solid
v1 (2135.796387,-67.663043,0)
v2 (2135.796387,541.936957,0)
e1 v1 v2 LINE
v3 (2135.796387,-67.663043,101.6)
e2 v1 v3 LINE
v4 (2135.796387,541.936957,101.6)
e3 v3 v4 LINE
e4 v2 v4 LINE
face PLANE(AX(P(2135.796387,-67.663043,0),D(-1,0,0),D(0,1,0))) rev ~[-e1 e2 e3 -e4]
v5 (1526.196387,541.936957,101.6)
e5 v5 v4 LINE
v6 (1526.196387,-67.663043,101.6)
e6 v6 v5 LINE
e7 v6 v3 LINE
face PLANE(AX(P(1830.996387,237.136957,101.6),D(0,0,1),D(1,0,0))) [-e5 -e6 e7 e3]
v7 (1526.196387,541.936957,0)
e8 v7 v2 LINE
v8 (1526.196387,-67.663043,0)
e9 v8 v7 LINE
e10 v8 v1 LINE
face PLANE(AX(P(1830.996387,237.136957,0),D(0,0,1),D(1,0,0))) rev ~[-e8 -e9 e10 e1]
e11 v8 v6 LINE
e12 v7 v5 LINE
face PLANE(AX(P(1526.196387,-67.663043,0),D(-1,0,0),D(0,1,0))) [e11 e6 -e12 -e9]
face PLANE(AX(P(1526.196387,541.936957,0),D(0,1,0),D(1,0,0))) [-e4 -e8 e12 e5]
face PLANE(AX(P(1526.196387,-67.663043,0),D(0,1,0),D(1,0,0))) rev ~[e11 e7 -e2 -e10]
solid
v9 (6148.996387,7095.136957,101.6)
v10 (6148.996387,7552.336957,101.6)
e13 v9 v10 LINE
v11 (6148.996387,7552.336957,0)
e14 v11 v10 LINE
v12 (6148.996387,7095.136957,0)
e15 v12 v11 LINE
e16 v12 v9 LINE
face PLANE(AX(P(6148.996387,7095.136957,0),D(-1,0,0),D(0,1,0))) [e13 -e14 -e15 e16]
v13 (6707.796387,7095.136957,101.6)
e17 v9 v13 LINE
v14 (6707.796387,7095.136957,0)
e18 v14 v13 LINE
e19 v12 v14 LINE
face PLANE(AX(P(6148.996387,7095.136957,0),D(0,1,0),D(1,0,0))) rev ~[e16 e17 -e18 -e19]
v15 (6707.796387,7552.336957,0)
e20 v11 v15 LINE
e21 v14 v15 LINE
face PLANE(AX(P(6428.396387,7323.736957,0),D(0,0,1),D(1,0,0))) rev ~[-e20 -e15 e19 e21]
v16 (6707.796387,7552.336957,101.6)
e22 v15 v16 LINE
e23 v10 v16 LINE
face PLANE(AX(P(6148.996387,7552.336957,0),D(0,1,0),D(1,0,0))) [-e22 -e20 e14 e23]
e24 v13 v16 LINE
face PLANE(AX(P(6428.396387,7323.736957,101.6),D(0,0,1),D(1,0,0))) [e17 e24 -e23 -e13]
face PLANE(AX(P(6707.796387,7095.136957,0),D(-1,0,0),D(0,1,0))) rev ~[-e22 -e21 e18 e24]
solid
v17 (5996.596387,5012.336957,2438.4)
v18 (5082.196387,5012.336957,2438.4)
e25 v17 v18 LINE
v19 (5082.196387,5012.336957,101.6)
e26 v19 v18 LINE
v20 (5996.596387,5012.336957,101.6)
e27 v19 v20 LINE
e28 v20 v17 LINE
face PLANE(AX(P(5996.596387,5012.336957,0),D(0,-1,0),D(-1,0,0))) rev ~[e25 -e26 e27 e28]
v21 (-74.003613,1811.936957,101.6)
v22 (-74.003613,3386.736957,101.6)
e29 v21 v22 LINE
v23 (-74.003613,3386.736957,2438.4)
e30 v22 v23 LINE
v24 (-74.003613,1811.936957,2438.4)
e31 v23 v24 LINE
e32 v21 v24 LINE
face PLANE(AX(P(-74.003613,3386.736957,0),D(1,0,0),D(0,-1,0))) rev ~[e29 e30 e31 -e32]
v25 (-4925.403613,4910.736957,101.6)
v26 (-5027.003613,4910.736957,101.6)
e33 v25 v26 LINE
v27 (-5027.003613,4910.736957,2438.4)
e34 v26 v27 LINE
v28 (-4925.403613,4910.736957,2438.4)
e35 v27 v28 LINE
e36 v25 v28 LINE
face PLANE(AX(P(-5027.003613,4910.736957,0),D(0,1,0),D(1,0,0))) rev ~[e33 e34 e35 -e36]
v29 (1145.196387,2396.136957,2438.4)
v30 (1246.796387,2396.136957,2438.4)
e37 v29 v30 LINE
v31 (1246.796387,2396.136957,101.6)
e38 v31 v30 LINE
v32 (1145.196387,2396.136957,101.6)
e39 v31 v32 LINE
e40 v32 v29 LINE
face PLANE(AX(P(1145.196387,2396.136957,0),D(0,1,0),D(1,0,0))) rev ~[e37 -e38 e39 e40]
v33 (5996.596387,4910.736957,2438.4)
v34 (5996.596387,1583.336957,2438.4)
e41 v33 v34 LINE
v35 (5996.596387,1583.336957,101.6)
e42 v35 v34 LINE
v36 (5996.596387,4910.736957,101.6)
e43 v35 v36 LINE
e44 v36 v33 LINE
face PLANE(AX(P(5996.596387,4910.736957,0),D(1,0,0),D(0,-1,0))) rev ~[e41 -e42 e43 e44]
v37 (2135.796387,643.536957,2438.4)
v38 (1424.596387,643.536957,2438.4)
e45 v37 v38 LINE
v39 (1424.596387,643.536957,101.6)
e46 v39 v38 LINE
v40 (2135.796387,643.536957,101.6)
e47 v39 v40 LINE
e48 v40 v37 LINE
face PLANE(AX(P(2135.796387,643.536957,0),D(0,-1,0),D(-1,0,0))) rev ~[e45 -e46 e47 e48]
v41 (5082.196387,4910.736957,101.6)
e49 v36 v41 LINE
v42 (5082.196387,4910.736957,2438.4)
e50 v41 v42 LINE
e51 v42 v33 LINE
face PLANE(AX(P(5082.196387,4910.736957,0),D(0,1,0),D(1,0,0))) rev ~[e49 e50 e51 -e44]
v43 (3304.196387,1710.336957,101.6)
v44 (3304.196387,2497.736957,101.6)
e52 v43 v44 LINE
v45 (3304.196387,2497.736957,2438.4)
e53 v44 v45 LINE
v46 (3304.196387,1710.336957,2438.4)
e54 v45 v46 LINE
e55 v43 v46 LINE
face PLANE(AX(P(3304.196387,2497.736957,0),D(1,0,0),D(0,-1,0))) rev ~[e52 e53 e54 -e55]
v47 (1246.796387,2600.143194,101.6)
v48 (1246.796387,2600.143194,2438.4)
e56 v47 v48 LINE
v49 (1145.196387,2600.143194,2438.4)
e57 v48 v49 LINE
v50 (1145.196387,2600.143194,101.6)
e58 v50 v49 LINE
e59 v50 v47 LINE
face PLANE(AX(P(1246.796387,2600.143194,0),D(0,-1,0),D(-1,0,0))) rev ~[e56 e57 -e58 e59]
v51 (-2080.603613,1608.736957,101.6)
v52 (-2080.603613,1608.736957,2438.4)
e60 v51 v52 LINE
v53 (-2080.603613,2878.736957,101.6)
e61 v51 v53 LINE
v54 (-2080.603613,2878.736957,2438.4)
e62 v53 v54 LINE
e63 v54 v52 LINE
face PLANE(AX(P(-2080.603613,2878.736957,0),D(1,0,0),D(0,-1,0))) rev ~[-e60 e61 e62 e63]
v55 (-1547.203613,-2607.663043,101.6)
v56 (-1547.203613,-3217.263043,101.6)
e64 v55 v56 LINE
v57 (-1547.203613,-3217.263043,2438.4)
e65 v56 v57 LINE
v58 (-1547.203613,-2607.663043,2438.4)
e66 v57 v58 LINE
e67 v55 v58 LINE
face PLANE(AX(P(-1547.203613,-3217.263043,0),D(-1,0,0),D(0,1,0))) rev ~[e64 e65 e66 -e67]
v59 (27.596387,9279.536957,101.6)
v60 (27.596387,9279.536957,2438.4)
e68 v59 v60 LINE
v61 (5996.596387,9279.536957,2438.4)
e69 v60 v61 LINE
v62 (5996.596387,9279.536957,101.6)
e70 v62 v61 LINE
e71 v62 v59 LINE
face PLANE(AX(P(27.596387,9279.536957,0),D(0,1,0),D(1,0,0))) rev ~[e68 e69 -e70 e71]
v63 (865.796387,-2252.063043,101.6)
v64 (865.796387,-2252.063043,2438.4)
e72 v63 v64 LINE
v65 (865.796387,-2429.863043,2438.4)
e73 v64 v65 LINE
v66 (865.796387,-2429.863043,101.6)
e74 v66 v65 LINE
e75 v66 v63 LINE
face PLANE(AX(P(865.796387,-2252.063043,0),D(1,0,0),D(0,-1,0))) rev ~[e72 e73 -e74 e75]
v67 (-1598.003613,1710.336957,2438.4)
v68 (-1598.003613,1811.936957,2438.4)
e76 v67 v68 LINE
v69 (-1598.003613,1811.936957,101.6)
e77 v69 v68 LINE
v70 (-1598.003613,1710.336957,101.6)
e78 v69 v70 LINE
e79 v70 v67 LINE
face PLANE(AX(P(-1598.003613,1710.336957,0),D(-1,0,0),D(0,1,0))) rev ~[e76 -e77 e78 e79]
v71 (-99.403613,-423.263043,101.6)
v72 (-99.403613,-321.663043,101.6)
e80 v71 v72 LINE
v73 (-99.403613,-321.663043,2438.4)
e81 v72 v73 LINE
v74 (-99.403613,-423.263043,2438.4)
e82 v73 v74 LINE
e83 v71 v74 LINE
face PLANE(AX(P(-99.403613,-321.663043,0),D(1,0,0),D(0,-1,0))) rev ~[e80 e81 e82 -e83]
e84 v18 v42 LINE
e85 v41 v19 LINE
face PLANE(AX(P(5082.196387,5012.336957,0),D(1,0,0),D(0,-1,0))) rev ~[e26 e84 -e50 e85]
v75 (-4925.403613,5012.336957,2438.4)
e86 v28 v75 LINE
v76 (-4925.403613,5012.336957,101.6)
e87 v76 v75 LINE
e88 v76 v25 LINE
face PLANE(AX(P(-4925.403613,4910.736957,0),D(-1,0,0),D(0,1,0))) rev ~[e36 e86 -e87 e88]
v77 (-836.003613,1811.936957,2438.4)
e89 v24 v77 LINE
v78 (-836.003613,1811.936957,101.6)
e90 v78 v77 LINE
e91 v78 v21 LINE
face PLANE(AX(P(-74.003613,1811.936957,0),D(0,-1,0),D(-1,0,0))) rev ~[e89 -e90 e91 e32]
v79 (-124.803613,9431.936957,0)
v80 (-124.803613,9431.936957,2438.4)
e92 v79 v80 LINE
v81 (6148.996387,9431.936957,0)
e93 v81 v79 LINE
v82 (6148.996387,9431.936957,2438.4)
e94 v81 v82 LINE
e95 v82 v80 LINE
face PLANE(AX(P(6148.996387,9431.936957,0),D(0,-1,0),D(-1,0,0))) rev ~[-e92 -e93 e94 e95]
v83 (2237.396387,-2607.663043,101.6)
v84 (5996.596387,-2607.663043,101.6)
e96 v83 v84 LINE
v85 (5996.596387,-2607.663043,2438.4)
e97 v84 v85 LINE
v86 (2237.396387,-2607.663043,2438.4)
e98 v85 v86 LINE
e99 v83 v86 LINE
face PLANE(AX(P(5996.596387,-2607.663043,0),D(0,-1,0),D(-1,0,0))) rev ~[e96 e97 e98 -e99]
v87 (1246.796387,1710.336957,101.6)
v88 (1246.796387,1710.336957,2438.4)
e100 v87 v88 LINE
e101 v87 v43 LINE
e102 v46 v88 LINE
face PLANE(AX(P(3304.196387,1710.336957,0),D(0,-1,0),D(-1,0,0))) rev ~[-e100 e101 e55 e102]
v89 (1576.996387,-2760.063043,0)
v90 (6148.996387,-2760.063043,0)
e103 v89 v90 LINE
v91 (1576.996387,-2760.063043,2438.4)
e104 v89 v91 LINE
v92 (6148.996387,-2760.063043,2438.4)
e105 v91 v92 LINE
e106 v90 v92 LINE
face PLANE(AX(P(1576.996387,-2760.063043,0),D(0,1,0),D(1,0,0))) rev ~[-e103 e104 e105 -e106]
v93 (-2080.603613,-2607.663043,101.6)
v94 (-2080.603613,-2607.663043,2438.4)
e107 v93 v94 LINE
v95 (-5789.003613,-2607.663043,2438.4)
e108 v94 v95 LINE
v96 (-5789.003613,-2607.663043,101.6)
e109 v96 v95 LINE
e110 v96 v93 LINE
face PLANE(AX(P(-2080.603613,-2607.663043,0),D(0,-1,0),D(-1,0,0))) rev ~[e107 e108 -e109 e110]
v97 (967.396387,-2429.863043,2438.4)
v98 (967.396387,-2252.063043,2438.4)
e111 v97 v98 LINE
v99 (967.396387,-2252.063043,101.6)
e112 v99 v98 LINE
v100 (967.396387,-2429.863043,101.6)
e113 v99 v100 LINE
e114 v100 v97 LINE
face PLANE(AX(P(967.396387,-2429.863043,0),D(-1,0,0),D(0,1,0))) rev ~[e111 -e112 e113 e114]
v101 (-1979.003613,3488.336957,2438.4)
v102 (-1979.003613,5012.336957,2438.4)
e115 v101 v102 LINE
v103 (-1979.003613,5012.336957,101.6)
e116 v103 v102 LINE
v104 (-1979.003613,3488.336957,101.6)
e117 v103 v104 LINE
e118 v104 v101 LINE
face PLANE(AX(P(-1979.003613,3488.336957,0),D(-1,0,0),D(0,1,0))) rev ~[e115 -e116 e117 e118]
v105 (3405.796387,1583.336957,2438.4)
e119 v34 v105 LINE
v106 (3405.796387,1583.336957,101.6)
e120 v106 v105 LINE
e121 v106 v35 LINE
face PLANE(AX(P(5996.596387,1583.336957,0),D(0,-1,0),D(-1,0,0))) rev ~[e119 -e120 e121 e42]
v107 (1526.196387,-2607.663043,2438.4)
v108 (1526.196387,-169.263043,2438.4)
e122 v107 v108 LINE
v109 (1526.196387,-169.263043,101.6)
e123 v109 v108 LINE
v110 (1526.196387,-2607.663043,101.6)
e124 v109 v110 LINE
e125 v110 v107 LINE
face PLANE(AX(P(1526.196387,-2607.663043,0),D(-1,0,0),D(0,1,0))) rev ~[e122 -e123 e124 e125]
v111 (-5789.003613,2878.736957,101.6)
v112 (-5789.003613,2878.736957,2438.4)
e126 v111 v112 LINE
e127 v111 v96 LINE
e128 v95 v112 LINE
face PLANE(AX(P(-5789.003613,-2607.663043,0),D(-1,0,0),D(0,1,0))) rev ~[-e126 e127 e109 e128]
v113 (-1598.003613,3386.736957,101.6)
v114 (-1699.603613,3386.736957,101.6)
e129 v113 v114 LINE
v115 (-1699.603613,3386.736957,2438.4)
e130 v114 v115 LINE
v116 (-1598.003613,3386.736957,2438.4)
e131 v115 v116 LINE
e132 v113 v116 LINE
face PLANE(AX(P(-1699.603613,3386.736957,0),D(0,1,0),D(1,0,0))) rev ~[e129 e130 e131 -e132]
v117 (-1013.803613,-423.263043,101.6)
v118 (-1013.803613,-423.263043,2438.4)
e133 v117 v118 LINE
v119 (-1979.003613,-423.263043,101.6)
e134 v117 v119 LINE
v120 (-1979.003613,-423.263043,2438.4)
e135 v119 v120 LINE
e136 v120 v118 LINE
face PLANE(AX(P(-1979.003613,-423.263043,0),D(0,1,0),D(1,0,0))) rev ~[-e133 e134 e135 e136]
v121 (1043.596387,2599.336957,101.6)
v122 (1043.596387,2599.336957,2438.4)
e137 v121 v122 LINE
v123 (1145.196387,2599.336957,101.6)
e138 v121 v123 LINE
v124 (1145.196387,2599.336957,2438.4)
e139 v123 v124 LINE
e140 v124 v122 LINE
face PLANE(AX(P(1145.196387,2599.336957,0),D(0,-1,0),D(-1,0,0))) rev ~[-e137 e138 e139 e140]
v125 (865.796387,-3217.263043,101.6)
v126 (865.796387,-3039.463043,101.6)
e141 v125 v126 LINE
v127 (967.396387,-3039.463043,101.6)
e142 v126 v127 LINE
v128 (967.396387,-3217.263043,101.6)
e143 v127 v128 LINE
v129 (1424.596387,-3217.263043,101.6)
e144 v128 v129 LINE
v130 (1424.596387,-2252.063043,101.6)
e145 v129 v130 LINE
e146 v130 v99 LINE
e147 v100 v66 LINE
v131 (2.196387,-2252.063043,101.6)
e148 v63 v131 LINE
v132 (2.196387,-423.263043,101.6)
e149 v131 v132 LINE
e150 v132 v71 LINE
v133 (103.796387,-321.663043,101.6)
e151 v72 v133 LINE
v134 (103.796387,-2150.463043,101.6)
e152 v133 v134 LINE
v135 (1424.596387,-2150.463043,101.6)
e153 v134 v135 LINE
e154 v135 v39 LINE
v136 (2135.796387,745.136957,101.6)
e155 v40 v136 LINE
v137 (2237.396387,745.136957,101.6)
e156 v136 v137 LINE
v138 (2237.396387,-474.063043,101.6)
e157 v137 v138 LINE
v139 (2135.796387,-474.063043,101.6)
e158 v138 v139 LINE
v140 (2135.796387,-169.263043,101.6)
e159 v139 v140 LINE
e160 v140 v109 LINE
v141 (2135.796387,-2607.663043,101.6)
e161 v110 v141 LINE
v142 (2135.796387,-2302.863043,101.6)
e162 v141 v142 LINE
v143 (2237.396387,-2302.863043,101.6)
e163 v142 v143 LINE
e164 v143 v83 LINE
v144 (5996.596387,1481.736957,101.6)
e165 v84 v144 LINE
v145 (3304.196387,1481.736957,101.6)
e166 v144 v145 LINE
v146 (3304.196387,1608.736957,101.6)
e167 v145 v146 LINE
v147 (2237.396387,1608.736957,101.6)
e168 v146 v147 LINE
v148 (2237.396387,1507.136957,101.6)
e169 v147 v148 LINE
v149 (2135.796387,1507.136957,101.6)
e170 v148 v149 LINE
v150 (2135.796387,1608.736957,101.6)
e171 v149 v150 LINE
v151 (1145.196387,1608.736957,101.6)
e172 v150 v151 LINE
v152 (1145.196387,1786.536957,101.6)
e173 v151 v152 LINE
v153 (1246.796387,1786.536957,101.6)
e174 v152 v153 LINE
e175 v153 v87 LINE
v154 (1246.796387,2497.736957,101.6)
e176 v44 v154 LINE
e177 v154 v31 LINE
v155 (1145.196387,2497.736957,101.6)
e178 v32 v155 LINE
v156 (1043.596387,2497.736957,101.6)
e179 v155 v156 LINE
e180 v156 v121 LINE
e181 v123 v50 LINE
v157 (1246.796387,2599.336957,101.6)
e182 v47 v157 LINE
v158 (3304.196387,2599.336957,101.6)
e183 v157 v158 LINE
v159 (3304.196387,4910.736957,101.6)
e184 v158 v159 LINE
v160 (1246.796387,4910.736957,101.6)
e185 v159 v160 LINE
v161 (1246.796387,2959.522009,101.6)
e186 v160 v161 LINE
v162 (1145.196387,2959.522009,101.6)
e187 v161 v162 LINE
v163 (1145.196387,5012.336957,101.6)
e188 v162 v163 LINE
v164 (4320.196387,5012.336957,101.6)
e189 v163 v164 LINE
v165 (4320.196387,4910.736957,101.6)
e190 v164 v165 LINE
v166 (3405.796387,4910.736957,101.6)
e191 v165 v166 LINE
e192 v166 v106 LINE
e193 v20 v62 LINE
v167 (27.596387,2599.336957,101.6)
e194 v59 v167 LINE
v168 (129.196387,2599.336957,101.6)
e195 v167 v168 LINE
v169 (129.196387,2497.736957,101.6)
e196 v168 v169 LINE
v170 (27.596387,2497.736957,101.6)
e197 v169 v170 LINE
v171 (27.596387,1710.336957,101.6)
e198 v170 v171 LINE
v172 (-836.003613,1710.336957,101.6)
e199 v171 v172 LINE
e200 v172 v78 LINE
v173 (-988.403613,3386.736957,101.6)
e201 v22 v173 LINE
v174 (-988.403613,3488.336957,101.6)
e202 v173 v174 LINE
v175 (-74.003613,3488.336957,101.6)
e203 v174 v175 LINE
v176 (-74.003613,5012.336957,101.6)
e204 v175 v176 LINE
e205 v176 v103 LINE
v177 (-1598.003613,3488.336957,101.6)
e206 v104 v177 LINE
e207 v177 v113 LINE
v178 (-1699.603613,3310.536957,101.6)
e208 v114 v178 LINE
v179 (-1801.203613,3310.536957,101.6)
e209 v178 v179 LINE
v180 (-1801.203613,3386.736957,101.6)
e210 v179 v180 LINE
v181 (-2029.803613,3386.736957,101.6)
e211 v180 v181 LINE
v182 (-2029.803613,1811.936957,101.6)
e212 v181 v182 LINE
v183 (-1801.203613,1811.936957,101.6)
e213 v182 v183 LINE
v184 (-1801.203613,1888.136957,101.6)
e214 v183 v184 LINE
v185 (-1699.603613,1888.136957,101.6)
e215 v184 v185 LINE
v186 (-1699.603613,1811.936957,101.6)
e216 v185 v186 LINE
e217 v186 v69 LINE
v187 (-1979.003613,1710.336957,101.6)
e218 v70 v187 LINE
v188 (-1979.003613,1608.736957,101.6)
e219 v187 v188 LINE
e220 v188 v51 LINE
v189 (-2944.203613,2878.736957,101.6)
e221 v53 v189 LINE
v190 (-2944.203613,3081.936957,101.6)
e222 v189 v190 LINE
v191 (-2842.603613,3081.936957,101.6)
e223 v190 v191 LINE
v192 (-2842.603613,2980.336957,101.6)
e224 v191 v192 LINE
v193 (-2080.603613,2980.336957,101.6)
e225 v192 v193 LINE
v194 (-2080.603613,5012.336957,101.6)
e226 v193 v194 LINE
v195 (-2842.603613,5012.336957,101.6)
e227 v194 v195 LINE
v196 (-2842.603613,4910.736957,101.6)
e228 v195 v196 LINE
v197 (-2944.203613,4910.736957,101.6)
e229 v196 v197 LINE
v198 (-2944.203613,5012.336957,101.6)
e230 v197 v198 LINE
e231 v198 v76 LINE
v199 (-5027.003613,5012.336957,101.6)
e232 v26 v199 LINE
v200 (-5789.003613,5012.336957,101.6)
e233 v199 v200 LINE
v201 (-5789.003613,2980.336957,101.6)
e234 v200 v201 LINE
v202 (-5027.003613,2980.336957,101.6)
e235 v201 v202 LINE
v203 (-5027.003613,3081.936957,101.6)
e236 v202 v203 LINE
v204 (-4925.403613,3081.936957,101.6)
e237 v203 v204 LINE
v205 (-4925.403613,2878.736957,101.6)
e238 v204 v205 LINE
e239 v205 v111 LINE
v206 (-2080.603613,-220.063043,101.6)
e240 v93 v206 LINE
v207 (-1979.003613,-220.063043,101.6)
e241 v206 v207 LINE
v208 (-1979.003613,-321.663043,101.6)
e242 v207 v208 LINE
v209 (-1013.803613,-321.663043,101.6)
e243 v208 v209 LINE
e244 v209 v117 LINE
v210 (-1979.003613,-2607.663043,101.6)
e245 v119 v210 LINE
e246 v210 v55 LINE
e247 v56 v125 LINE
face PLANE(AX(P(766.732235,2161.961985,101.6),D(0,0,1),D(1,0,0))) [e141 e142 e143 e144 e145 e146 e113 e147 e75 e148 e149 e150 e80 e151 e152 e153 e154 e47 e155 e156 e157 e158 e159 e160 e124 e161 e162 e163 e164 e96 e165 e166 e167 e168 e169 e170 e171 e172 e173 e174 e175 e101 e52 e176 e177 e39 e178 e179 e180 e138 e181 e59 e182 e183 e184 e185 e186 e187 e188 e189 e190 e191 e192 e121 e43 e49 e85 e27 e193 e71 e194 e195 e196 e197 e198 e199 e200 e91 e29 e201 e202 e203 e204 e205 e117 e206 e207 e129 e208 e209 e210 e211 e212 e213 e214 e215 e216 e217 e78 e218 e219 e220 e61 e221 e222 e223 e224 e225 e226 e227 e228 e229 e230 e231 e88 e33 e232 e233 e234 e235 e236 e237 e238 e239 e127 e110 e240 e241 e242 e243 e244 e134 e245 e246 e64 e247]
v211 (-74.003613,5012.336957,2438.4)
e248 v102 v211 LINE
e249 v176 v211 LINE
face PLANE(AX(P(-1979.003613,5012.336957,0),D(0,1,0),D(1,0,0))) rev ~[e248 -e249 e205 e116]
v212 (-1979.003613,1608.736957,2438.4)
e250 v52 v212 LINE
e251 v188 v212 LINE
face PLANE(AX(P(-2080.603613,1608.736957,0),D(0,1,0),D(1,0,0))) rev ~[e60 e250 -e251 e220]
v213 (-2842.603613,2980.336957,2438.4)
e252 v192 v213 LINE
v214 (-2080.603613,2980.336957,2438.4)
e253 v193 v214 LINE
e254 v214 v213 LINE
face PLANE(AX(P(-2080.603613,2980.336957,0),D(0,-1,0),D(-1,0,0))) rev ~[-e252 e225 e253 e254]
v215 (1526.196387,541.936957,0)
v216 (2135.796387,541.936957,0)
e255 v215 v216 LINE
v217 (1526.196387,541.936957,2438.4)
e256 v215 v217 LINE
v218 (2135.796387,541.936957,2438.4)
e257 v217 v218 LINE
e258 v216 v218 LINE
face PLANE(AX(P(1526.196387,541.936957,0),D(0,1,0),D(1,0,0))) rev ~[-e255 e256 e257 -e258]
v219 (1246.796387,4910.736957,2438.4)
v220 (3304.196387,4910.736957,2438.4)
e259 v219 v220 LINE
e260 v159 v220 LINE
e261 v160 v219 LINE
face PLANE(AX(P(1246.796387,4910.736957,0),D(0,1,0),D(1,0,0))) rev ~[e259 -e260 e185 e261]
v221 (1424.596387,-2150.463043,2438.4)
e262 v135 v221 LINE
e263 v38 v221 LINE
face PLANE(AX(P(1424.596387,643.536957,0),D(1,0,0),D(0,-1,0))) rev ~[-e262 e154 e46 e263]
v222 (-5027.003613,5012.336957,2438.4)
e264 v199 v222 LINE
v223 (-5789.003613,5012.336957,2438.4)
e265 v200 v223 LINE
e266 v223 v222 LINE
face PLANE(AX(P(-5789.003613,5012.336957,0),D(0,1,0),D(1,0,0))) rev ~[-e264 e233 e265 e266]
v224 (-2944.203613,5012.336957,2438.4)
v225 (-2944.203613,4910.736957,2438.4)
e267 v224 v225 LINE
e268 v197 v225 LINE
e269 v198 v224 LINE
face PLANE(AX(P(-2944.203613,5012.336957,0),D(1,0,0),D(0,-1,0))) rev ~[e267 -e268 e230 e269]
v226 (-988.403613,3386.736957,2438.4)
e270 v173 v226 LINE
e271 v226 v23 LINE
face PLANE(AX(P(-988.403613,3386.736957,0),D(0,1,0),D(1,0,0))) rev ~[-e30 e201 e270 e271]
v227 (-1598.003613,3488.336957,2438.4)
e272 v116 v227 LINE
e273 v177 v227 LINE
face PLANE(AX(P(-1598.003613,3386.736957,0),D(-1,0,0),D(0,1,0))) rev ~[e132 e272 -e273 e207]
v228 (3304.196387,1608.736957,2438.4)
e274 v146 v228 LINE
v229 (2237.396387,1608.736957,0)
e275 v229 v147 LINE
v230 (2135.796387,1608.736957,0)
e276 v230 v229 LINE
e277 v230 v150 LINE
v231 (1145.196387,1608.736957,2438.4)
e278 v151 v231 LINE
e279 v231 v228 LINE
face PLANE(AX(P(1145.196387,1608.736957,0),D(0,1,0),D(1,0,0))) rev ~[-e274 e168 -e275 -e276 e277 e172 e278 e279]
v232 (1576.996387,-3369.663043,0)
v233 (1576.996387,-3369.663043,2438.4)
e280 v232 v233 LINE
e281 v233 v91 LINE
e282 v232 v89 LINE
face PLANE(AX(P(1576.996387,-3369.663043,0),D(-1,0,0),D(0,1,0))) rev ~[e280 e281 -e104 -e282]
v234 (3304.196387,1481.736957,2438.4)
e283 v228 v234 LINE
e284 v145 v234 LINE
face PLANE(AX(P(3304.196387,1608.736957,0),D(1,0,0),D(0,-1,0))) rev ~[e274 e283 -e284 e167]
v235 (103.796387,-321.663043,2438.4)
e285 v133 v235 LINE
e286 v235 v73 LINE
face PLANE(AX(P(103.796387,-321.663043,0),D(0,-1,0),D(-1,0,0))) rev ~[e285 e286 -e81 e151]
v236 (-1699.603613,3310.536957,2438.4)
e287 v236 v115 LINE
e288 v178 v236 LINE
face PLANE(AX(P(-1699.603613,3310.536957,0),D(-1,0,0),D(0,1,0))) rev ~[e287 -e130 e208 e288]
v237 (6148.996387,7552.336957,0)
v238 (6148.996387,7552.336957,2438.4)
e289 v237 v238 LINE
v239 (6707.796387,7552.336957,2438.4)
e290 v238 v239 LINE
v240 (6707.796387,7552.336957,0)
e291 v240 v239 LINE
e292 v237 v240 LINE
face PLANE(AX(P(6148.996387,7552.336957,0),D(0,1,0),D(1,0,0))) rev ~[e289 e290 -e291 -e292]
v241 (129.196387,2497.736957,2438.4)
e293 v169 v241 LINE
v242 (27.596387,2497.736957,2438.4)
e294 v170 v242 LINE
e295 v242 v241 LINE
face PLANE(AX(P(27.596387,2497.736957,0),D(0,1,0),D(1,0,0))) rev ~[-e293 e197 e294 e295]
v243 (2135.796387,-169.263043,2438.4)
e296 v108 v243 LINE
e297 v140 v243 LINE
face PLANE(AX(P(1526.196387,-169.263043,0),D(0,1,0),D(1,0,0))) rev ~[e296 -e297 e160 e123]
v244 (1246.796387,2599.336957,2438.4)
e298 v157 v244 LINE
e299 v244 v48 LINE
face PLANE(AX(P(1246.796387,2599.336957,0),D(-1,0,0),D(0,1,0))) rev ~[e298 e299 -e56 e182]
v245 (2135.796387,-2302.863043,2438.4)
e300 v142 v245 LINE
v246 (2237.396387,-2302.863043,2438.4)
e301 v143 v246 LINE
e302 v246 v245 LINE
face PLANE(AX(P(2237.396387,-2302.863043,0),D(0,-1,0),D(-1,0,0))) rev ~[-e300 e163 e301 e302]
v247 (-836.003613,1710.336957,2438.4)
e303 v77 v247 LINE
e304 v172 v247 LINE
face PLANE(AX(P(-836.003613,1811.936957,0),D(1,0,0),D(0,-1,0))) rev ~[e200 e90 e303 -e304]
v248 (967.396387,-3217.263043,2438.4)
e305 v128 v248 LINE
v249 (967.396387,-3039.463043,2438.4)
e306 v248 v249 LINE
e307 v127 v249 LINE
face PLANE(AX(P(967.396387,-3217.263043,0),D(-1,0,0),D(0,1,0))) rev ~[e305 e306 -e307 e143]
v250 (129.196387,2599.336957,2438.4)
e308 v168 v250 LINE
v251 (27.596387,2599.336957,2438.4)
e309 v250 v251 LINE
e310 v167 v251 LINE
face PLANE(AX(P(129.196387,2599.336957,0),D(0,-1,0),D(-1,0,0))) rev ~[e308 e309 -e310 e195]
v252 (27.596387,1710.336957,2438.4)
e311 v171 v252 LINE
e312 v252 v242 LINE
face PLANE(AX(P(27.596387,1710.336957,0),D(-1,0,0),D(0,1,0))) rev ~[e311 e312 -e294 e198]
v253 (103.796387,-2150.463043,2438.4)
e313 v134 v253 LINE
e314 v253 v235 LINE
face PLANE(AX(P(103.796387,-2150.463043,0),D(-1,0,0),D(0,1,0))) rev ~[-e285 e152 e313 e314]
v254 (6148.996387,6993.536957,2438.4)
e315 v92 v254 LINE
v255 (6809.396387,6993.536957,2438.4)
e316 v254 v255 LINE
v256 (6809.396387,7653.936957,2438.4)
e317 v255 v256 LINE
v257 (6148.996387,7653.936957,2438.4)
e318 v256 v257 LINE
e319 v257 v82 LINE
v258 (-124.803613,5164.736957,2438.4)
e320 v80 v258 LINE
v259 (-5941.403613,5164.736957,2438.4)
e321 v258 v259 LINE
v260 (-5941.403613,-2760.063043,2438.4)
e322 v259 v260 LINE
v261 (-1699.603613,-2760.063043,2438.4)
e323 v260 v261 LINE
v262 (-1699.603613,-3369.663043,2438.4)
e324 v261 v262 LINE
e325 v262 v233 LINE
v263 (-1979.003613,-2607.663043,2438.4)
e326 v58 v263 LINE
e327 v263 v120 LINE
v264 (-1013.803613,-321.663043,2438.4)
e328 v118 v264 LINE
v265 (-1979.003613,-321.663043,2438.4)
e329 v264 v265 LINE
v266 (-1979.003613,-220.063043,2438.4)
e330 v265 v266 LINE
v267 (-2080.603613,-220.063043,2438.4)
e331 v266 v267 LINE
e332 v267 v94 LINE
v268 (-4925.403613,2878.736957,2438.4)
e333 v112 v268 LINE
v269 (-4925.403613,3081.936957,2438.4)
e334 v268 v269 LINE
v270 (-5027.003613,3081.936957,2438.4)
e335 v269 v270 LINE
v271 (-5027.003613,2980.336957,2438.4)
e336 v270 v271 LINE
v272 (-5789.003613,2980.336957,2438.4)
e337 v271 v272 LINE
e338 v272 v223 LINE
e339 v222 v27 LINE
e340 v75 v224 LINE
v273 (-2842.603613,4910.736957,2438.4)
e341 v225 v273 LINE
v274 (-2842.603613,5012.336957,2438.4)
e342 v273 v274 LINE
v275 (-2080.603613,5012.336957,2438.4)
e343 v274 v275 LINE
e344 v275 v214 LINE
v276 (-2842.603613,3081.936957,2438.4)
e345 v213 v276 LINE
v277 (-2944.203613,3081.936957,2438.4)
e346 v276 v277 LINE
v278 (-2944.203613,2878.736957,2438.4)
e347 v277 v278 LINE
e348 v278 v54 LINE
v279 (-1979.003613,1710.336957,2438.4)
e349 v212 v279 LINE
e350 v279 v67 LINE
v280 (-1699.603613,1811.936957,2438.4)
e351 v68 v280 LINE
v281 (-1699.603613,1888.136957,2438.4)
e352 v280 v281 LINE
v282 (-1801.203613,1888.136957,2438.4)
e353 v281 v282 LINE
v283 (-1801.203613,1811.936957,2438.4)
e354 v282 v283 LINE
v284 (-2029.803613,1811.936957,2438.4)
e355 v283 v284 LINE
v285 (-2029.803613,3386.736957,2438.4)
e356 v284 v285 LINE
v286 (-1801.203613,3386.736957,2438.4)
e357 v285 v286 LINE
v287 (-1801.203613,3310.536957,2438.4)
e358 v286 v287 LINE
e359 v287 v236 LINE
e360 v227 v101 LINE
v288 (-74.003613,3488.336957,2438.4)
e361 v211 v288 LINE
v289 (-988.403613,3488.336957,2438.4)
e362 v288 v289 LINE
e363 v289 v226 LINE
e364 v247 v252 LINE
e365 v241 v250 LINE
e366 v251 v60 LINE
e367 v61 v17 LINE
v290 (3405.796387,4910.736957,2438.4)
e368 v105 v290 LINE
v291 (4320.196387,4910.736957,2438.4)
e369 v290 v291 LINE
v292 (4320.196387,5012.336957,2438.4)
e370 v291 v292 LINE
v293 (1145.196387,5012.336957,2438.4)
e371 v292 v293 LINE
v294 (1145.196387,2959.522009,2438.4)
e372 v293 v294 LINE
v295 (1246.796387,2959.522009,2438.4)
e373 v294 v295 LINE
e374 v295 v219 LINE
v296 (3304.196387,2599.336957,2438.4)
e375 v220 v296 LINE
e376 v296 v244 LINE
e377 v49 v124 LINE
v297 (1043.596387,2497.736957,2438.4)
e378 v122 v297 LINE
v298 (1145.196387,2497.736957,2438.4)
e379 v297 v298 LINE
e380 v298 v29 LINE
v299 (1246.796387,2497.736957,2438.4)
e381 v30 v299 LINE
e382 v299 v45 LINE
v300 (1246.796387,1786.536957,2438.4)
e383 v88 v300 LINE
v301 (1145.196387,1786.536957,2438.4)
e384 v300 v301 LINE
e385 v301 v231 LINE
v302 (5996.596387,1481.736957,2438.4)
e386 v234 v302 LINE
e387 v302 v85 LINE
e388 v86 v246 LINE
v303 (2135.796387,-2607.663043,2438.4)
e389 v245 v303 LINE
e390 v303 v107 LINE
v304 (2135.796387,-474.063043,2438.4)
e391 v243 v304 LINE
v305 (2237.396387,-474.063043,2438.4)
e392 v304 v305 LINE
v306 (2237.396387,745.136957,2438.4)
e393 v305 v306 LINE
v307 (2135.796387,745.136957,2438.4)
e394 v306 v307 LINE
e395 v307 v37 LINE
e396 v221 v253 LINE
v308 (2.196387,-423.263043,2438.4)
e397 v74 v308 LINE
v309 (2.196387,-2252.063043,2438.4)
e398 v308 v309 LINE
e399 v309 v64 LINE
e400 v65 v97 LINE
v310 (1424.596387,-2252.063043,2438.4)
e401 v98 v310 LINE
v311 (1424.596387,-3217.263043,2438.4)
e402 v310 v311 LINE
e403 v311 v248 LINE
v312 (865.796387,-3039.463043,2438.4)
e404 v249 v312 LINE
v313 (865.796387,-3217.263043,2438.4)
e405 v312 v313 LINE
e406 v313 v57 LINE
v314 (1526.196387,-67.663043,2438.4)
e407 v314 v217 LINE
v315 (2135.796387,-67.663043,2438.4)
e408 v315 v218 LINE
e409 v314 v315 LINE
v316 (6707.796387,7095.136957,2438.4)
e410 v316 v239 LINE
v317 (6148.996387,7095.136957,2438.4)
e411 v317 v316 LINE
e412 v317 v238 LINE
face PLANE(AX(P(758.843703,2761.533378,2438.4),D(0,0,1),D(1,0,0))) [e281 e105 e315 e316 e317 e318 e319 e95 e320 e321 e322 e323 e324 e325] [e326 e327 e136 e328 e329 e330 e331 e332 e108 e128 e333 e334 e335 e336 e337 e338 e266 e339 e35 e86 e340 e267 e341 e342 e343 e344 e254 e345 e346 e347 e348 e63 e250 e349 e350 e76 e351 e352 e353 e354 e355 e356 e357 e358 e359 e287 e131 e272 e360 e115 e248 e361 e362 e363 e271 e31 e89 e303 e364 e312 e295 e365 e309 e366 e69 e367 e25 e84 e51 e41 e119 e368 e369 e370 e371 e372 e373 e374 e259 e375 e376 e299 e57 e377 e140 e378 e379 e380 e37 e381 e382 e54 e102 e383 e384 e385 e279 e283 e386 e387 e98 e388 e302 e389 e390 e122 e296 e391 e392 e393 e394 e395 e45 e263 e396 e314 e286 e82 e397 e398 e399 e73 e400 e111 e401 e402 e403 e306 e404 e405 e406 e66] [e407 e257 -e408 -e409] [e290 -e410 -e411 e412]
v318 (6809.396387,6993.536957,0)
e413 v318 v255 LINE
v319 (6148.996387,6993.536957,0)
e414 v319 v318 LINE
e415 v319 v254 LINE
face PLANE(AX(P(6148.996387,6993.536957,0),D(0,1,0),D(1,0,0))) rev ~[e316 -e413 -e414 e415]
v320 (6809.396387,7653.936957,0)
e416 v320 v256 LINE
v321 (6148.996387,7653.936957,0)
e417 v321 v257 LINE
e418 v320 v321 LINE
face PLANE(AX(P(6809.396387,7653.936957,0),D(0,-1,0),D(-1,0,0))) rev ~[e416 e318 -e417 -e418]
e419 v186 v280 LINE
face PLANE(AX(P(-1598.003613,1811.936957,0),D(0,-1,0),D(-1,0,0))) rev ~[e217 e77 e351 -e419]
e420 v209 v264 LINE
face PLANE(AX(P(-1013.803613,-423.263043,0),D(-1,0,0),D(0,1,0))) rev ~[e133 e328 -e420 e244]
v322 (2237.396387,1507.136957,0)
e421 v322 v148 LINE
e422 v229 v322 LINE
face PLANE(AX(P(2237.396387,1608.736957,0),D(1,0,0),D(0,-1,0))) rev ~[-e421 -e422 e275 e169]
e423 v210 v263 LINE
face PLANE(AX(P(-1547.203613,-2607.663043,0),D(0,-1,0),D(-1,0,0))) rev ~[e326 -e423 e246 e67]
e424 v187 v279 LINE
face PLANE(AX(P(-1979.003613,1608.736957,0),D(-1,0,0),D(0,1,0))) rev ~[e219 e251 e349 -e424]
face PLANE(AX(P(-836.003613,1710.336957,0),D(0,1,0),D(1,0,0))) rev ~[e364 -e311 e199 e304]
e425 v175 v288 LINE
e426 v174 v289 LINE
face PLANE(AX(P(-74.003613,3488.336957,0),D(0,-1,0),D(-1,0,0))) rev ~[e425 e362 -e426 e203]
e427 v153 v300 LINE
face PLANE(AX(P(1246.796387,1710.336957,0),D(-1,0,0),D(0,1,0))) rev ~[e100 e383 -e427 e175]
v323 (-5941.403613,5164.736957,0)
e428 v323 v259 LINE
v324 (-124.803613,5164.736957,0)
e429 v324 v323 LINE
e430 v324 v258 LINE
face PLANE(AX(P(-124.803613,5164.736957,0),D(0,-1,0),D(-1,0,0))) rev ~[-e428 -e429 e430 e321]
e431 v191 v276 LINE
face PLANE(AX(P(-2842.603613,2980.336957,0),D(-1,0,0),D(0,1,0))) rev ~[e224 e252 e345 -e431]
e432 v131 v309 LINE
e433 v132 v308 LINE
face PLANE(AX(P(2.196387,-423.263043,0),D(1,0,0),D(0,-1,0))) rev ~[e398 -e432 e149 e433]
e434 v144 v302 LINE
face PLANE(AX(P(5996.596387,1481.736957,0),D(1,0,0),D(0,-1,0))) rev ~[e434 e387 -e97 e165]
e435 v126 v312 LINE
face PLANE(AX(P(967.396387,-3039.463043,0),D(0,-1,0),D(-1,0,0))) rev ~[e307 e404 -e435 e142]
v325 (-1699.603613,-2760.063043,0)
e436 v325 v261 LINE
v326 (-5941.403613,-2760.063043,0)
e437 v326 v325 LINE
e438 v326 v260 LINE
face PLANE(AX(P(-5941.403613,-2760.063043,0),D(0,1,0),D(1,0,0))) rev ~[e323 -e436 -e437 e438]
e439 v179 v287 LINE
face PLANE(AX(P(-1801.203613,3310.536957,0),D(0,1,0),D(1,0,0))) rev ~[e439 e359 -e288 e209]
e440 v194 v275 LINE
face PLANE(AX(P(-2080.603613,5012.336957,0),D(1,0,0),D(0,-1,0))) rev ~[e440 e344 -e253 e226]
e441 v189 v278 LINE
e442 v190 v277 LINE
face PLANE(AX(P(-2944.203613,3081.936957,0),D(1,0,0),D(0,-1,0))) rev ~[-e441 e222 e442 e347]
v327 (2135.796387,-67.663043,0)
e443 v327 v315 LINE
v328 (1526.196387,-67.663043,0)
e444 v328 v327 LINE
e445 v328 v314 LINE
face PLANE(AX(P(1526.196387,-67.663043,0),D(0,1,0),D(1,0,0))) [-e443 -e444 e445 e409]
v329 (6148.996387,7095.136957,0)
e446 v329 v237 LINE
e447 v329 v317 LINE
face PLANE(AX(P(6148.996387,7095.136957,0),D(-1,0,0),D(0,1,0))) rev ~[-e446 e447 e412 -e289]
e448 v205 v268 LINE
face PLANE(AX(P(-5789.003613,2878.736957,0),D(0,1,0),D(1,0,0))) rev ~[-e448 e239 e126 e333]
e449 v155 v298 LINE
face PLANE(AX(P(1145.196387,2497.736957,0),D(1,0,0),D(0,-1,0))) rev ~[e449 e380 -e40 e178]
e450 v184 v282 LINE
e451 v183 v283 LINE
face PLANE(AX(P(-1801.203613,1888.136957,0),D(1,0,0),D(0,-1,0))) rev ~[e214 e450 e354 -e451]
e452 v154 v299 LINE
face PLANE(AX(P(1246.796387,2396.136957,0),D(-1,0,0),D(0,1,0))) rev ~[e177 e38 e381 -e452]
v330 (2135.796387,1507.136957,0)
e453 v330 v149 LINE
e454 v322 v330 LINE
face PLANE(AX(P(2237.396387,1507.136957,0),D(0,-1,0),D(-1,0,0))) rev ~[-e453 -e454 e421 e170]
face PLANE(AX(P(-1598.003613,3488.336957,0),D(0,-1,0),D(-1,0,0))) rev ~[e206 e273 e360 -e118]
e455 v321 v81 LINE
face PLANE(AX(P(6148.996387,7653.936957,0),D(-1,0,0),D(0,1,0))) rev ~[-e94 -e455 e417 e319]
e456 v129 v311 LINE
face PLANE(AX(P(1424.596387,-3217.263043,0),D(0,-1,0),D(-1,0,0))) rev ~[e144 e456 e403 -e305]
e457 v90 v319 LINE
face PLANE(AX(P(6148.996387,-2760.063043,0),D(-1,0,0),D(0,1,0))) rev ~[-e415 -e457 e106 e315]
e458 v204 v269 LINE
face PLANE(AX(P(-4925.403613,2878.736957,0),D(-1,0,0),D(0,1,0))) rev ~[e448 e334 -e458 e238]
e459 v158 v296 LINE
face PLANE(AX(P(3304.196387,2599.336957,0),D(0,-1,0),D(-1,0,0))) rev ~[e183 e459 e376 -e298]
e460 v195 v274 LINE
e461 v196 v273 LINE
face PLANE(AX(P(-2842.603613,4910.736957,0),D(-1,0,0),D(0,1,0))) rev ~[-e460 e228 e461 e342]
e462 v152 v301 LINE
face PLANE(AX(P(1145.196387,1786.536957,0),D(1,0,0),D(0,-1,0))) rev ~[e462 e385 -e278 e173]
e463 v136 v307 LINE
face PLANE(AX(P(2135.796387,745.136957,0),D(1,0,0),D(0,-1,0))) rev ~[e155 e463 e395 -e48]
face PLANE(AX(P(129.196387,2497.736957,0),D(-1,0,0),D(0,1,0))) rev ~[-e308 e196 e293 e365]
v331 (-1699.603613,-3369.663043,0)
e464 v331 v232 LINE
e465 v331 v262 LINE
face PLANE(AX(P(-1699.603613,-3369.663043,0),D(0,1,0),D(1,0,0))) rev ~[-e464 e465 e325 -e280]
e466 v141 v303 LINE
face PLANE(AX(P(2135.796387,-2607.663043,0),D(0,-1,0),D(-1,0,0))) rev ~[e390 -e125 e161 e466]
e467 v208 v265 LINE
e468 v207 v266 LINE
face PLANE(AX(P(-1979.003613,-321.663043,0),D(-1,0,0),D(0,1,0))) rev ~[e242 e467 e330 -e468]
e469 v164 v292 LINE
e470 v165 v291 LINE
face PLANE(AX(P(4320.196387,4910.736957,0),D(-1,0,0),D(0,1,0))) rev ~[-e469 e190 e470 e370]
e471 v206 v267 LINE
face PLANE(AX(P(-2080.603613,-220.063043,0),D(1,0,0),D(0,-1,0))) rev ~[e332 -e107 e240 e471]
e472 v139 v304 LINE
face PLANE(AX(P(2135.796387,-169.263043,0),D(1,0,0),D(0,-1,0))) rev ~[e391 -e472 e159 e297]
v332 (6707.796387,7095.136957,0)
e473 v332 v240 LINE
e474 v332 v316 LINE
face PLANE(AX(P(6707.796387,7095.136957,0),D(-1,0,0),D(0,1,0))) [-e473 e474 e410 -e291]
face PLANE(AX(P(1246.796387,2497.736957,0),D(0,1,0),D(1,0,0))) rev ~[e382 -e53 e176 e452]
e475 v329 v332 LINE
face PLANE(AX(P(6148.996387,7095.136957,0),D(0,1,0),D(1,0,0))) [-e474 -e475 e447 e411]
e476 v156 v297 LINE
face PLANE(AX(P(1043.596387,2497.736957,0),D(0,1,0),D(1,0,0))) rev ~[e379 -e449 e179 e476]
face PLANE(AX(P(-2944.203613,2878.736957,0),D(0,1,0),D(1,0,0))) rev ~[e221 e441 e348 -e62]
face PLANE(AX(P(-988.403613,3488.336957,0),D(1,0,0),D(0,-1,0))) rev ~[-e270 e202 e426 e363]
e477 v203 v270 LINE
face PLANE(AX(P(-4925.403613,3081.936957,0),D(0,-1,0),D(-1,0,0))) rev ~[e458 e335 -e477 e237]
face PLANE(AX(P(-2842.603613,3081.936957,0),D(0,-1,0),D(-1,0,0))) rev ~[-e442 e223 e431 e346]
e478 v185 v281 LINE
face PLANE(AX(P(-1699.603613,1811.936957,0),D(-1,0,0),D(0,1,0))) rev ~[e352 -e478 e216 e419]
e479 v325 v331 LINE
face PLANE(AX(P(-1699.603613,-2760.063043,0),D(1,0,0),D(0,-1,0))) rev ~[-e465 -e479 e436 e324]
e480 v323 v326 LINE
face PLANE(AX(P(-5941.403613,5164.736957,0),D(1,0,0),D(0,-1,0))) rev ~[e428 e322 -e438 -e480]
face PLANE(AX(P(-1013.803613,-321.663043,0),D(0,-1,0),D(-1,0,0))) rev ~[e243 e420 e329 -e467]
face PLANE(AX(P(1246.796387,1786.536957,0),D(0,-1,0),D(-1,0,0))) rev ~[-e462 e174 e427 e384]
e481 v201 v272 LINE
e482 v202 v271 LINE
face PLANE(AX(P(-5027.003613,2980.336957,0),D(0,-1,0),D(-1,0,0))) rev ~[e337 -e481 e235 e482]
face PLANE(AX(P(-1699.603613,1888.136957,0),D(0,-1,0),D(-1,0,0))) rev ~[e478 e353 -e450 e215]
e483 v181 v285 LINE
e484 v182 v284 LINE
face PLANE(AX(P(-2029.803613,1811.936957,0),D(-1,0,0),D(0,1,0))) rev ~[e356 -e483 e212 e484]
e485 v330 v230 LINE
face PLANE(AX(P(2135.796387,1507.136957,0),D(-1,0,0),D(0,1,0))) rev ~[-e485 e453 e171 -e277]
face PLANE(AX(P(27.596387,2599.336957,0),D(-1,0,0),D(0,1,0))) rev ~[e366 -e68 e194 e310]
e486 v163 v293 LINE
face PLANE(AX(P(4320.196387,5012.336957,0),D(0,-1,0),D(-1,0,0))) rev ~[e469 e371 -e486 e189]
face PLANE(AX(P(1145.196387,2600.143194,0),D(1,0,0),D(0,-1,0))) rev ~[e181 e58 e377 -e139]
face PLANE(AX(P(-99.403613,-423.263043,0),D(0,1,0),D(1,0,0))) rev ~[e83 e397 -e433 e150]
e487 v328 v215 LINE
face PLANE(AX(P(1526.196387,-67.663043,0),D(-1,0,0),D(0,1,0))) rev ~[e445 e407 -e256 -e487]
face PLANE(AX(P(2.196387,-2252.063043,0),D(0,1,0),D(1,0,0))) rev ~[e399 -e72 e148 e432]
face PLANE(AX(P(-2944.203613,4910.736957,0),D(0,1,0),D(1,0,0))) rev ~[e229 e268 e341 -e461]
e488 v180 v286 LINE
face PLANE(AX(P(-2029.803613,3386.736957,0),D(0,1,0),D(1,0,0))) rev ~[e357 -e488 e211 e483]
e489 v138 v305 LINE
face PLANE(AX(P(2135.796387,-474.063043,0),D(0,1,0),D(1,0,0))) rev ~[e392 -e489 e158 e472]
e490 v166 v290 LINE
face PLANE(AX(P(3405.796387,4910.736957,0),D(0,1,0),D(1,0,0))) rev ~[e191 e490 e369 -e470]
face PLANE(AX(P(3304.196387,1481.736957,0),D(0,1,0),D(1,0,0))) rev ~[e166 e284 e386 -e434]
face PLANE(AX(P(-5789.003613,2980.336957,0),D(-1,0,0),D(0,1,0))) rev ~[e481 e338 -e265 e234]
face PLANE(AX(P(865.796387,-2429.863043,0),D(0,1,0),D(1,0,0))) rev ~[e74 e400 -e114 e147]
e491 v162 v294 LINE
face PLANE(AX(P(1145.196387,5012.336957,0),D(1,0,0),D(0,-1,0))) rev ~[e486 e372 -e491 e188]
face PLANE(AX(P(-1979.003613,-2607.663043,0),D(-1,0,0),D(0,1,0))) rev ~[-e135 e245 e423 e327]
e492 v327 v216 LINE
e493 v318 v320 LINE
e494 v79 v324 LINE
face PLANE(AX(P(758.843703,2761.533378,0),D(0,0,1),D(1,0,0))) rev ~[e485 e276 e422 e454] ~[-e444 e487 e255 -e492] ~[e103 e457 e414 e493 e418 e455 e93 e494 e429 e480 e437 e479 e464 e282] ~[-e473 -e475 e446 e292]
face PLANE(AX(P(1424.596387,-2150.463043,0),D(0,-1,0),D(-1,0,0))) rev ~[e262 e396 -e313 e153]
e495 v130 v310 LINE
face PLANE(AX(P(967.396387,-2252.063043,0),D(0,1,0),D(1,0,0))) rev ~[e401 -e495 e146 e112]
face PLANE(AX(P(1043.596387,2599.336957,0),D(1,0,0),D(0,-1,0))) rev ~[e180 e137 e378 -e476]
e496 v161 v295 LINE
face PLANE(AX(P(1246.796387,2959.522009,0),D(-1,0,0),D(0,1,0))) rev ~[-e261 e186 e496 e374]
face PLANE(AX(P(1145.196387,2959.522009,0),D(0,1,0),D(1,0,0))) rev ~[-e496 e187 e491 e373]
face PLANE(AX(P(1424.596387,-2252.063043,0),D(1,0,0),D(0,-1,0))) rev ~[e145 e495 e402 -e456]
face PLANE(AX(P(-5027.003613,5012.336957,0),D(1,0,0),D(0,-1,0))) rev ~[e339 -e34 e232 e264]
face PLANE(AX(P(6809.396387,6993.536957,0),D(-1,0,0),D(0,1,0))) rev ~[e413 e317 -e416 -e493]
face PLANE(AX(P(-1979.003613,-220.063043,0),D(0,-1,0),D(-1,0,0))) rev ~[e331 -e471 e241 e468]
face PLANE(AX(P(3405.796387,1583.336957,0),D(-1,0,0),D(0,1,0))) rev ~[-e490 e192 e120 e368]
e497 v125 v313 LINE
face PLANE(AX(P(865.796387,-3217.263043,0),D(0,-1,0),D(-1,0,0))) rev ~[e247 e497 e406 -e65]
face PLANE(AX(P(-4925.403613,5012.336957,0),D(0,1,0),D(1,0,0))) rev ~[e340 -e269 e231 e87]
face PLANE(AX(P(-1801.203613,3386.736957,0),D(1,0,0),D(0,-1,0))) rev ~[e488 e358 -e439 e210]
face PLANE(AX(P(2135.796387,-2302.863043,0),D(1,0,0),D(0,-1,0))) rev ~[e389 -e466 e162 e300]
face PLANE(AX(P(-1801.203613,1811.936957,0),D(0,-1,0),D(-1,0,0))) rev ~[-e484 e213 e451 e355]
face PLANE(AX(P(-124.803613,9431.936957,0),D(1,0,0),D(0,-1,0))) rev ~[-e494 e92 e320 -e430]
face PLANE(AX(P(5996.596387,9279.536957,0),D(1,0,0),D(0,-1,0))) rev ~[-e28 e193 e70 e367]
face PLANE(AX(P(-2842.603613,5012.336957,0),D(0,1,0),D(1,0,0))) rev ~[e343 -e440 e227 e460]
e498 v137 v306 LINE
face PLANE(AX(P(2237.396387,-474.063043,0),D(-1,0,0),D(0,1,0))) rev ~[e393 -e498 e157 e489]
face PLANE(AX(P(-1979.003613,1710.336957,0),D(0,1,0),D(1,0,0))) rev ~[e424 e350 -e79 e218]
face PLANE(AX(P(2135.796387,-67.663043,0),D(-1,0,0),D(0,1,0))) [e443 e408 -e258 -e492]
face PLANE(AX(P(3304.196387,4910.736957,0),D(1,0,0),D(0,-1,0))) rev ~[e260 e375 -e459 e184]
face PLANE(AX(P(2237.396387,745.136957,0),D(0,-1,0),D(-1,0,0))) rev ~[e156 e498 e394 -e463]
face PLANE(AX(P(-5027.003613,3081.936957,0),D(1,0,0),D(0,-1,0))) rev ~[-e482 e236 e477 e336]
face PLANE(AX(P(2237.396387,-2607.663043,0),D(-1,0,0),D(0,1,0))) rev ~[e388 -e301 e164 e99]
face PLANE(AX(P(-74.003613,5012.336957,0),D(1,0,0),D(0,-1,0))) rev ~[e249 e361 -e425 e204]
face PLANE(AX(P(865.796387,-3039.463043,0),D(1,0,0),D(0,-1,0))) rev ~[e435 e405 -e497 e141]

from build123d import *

# Parameters (mm, degrees)
F1_DEPTH = 101.6
F0_W     = 609.6
F0_H     = 609.6
F0_W_2   = 558.8
F0_H_2   = 457.2
F2_DEPTH = 2438.4


with BuildPart() as f1:
    # F0 (on Top) → F1 (new body)
    with BuildSketch(Plane.XY):
        Polygon((5996.5963871956, 9279.5369567871), (27.5963871956, 9279.5369567871), (27.5963871956, 5012.3369567871), (27.5963871956, 2599.3369567871), (129.1963871956, 2599.3369567871), (129.1963871956, 2497.7369567871), (27.5963871956, 2497.7369567871), (27.5963871956, 1710.3369567871), (-836.0036128044, 1710.3369567871), (-836.0036128044, 1811.9369567871), (-74.0036128044, 1811.9369567871), (-74.0036128044, 3386.7369567871), (-988.4036128044, 3386.7369567871), (-988.4036128044, 3488.3369567871), (-74.0036128044, 3488.3369567871), (-74.0036128044, 5012.3369567871), (-1979.0036128044, 5012.3369567871), (-1979.0036128044, 3488.3369567871), (-1598.0036128044, 3488.3369567871), (-1598.0036128044, 3386.7369567871), (-1699.6036128044, 3386.7369567871), (-1699.6036128044, 3310.5369567871), (-1801.2036128044, 3310.5369567871), (-1801.2036128044, 3386.7369567871), (-2029.8036128044, 3386.7369567871), (-2029.8036128044, 1811.9369567871), (-1801.2036128044, 1811.9369567871), (-1801.2036128044, 1888.1369567871), (-1699.6036128044, 1888.1369567871), (-1699.6036128044, 1811.9369567871), (-1598.0036128044, 1811.9369567871), (-1598.0036128044, 1710.3369567871), (-1979.0036128044, 1710.3369567871), (-1979.0036128044, 1608.7369567871), (-2080.6036128044, 1608.7369567871), (-2080.6036128044, 2878.7369567871), (-2944.2036128044, 2878.7369567871), (-2944.2036128044, 3081.9369567871), (-2842.6036128044, 3081.9369567871), (-2842.6036128044, 2980.3369567871), (-2080.6036128044, 2980.3369567871), (-2080.6036128044, 5012.3369567871), (-2842.6036128044, 5012.3369567871), (-2842.6036128044, 4910.7369567871), (-2944.2036128044, 4910.7369567871), (-2944.2036128044, 5012.3369567871), (-4925.4036128044, 5012.3369567871), (-4925.4036128044, 4910.7369567871), (-5027.0036128044, 4910.7369567871), (-5027.0036128044, 5012.3369567871), (-5789.0036128044, 5012.3369567871), (-5789.0036128044, 2980.3369567871), (-5027.0036128044, 2980.3369567871), (-5027.0036128044, 3081.9369567871), (-4925.4036128044, 3081.9369567871), (-4925.4036128044, 2878.7369567871), (-5789.0036128044, 2878.7369567871), (-5789.0036128044, -2607.6630432129), (-2080.6036128044, -2607.6630432129), (-2080.6036128044, -220.0630432129), (-1979.0036128044, -220.0630432129), (-1979.0036128044, -321.6630432129), (-1013.8036128044, -321.6630432129), (-1013.8036128044, -423.2630432129), (-1979.0036128044, -423.2630432129), (-1979.0036128044, -2607.6630432129), (-1547.2036128044, -2607.6630432129), (-1547.2036128044, -3217.2630432129), (865.7963871956, -3217.2630432129), (865.7963871956, -3039.4630432129), (967.3963871956, -3039.4630432129), (967.3963871956, -3217.2630432129), (1424.5963871956, -3217.2630432129), (1424.5963871956, -2607.6630432129), (1424.5963871956, -2252.0630432129), (967.3963871956, -2252.0630432129), (967.3963871956, -2429.8630432129), (865.7963871956, -2429.8630432129), (865.7963871956, -2252.0630432129), (2.1963871956, -2252.0630432129), (2.1963871956, -423.2630432129), (-99.4036128044, -423.2630432129), (-99.4036128044, -321.6630432129), (103.7963871956, -321.6630432129), (103.7963871956, -2150.4630432129), (1424.5963871956, -2150.4630432129), (1424.5963871956, 643.5369567871), (2135.7963871956, 643.5369567871), (2135.7963871956, 745.1369567871), (2237.3963871956, 745.1369567871), (2237.3963871956, -474.0630432129), (2135.7963871956, -474.0630432129), (2135.7963871956, -169.2630432129), (1526.1963871956, -169.2630432129), (1526.1963871956, -2607.6630432129), (2135.7963871956, -2607.6630432129), (2135.7963871956, -2302.8630432129), (2237.3963871956, -2302.8630432129), (2237.3963871956, -2607.6630432129), (5996.5963871956, -2607.6630432129), (5996.5963871956, 1481.7369567871), (3304.1963871956, 1481.7369567871), (3304.1963871956, 1608.7369567871), (2237.3963871956, 1608.7369567871), (2237.3963871956, 1507.1369567871), (2135.7963871956, 1507.1369567871), (2135.7963871956, 1608.7369567871), (1145.1963871956, 1608.7369567871), (1145.1963871956, 1786.5369567871), (1246.7963871956, 1786.5369567871), (1246.7963871956, 1710.3369567871), (3304.1963871956, 1710.3369567871), (3304.1963871956, 2497.7369567871), (1246.7963871956, 2497.7369567871), (1246.7963871956, 2396.1369567871), (1145.1963871956, 2396.1369567871), (1145.1963871956, 2497.7369567871), (1043.5963871956, 2497.7369567871), (1043.5963871956, 2599.3369567871), (1145.1963871956, 2599.3369567871), (1145.1963871956, 2600.1431941986), (1246.7963871956, 2600.1431941986), (1246.7963871956, 2599.3369567871), (3304.1963871956, 2599.3369567871), (3304.1963871956, 4910.7369567871), (1246.7963871956, 4910.7369567871), (1246.7963871956, 2959.5220088959), (1145.1963871956, 2959.5220088959), (1145.1963871956, 5012.3369567871), (4320.1963871956, 5012.3369567871), (4320.1963871956, 4910.7369567871), (3405.7963871956, 4910.7369567871), (3405.7963871956, 2497.7369567871), (3405.7963871956, 1583.3369567871), (5996.5963871956, 1583.3369567871), (5996.5963871956, 4910.7369567871), (5082.1963871956, 4910.7369567871), (5082.1963871956, 5012.3369567871), (5996.5963871956, 5012.3369567871), align=None)
    extrude(amount=F1_DEPTH)

    # F0 (on Top) → F2 (join)
    with BuildSketch(Plane.XY):
        Polygon((6148.9963871956, 9431.9369567871), (-124.8036128044, 9431.9369567871), (-124.8036128044, 5164.7369567871), (-5941.4036128044, 5164.7369567871), (-5941.4036128044, -2760.0630432129), (-1699.6036128044, -2760.0630432129), (-1699.6036128044, -3369.6630432129), (1576.9963871956, -3369.6630432129), (1576.9963871956, -2760.0630432129), (6148.9963871956, -2760.0630432129), (6148.9963871956, 6993.5369567871), (6809.3963871956, 6993.5369567871), (6809.3963871956, 7653.9369567871), (6148.9963871956, 7653.9369567871), align=None)
        with Locations((1830.9963871956, 237.1369567871)):
            Rectangle(F0_W, F0_H, mode=Mode.SUBTRACT)
        Polygon((27.5963871956, 5012.3369567871), (27.5963871956, 9279.5369567871), (5996.5963871956, 9279.5369567871), (5996.5963871956, 5012.3369567871), (5082.1963871956, 5012.3369567871), (5082.1963871956, 4910.7369567871), (5996.5963871956, 4910.7369567871), (5996.5963871956, 1583.3369567871), (3405.7963871956, 1583.3369567871), (3405.7963871956, 2497.7369567871), (3405.7963871956, 4910.7369567871), (4320.1963871956, 4910.7369567871), (4320.1963871956, 5012.3369567871), (1145.1963871956, 5012.3369567871), (1145.1963871956, 2959.5220088959), (1246.7963871956, 2959.5220088959), (1246.7963871956, 4910.7369567871), (3304.1963871956, 4910.7369567871), (3304.1963871956, 2599.3369567871), (1246.7963871956, 2599.3369567871), (1246.7963871956, 2600.1431941986), (1145.1963871956, 2600.1431941986), (1145.1963871956, 2599.3369567871), (1043.5963871956, 2599.3369567871), (1043.5963871956, 2497.7369567871), (1145.1963871956, 2497.7369567871), (1145.1963871956, 2396.1369567871), (1246.7963871956, 2396.1369567871), (1246.7963871956, 2497.7369567871), (3304.1963871956, 2497.7369567871), (3304.1963871956, 1710.3369567871), (1246.7963871956, 1710.3369567871), (1246.7963871956, 1786.5369567871), (1145.1963871956, 1786.5369567871), (1145.1963871956, 1608.7369567871), (2135.7963871956, 1608.7369567871), (2237.3963871956, 1608.7369567871), (3304.1963871956, 1608.7369567871), (3304.1963871956, 1481.7369567871), (5996.5963871956, 1481.7369567871), (5996.5963871956, -2607.6630432129), (2237.3963871956, -2607.6630432129), (2237.3963871956, -2302.8630432129), (2135.7963871956, -2302.8630432129), (2135.7963871956, -2607.6630432129), (1526.1963871956, -2607.6630432129), (1526.1963871956, -169.2630432129), (2135.7963871956, -169.2630432129), (2135.7963871956, -474.0630432129), (2237.3963871956, -474.0630432129), (2237.3963871956, 745.1369567871), (2135.7963871956, 745.1369567871), (2135.7963871956, 643.5369567871), (1424.5963871956, 643.5369567871), (1424.5963871956, -2150.4630432129), (103.7963871956, -2150.4630432129), (103.7963871956, -321.6630432129), (-99.4036128044, -321.6630432129), (-99.4036128044, -423.2630432129), (2.1963871956, -423.2630432129), (2.1963871956, -2252.0630432129), (865.7963871956, -2252.0630432129), (865.7963871956, -2429.8630432129), (967.3963871956, -2429.8630432129), (967.3963871956, -2252.0630432129), (1424.5963871956, -2252.0630432129), (1424.5963871956, -2607.6630432129), (1424.5963871956, -3217.2630432129), (967.3963871956, -3217.2630432129), (967.3963871956, -3039.4630432129), (865.7963871956, -3039.4630432129), (865.7963871956, -3217.2630432129), (-1547.2036128044, -3217.2630432129), (-1547.2036128044, -2607.6630432129), (-1979.0036128044, -2607.6630432129), (-1979.0036128044, -423.2630432129), (-1013.8036128044, -423.2630432129), (-1013.8036128044, -321.6630432129), (-1979.0036128044, -321.6630432129), (-1979.0036128044, -220.0630432129), (-2080.6036128044, -220.0630432129), (-2080.6036128044, -2607.6630432129), (-5789.0036128044, -2607.6630432129), (-5789.0036128044, 2878.7369567871), (-4925.4036128044, 2878.7369567871), (-4925.4036128044, 3081.9369567871), (-5027.0036128044, 3081.9369567871), (-5027.0036128044, 2980.3369567871), (-5789.0036128044, 2980.3369567871), (-5789.0036128044, 5012.3369567871), (-5027.0036128044, 5012.3369567871), (-5027.0036128044, 4910.7369567871), (-4925.4036128044, 4910.7369567871), (-4925.4036128044, 5012.3369567871), (-2944.2036128044, 5012.3369567871), (-2944.2036128044, 4910.7369567871), (-2842.6036128044, 4910.7369567871), (-2842.6036128044, 5012.3369567871), (-2080.6036128044, 5012.3369567871), (-2080.6036128044, 2980.3369567871), (-2842.6036128044, 2980.3369567871), (-2842.6036128044, 3081.9369567871), (-2944.2036128044, 3081.9369567871), (-2944.2036128044, 2878.7369567871), (-2080.6036128044, 2878.7369567871), (-2080.6036128044, 1608.7369567871), (-1979.0036128044, 1608.7369567871), (-1979.0036128044, 1710.3369567871), (-1598.0036128044, 1710.3369567871), (-1598.0036128044, 1811.9369567871), (-1699.6036128044, 1811.9369567871), (-1699.6036128044, 1888.1369567871), (-1801.2036128044, 1888.1369567871), (-1801.2036128044, 1811.9369567871), (-2029.8036128044, 1811.9369567871), (-2029.8036128044, 3386.7369567871), (-1801.2036128044, 3386.7369567871), (-1801.2036128044, 3310.5369567871), (-1699.6036128044, 3310.5369567871), (-1699.6036128044, 3386.7369567871), (-1598.0036128044, 3386.7369567871), (-1598.0036128044, 3488.3369567871), (-1979.0036128044, 3488.3369567871), (-1979.0036128044, 5012.3369567871), (-74.0036128044, 5012.3369567871), (-74.0036128044, 3488.3369567871), (-988.4036128044, 3488.3369567871), (-988.4036128044, 3386.7369567871), (-74.0036128044, 3386.7369567871), (-74.0036128044, 1811.9369567871), (-836.0036128044, 1811.9369567871), (-836.0036128044, 1710.3369567871), (27.5963871956, 1710.3369567871), (27.5963871956, 2497.7369567871), (129.1963871956, 2497.7369567871), (129.1963871956, 2599.3369567871), (27.5963871956, 2599.3369567871), align=None, mode=Mode.SUBTRACT)
        with Locations((6428.3963871956, 7323.7369567871)):
            Rectangle(F0_W_2, F0_H_2, mode=Mode.SUBTRACT)
    extrude(amount=F2_DEPTH)


with BuildPart() as f1b:
    # F0 (on Top) → F1, piece 2 (new body)
    with BuildSketch(Plane.XY):
        with Locations((1830.9963871956, 237.1369567871)):
            Rectangle(F0_W, F0_H)
    extrude(amount=F1_DEPTH)


with BuildPart() as f1c:
    # F0 (on Top) → F1, piece 3 (new body)
    with BuildSketch(Plane.XY):
        with Locations((6428.3963871956, 7323.7369567871)):
            Rectangle(F0_W_2, F0_H_2)
    extrude(amount=F1_DEPTH)


solid = Compound([f1.part, f1b.part, f1c.part])
